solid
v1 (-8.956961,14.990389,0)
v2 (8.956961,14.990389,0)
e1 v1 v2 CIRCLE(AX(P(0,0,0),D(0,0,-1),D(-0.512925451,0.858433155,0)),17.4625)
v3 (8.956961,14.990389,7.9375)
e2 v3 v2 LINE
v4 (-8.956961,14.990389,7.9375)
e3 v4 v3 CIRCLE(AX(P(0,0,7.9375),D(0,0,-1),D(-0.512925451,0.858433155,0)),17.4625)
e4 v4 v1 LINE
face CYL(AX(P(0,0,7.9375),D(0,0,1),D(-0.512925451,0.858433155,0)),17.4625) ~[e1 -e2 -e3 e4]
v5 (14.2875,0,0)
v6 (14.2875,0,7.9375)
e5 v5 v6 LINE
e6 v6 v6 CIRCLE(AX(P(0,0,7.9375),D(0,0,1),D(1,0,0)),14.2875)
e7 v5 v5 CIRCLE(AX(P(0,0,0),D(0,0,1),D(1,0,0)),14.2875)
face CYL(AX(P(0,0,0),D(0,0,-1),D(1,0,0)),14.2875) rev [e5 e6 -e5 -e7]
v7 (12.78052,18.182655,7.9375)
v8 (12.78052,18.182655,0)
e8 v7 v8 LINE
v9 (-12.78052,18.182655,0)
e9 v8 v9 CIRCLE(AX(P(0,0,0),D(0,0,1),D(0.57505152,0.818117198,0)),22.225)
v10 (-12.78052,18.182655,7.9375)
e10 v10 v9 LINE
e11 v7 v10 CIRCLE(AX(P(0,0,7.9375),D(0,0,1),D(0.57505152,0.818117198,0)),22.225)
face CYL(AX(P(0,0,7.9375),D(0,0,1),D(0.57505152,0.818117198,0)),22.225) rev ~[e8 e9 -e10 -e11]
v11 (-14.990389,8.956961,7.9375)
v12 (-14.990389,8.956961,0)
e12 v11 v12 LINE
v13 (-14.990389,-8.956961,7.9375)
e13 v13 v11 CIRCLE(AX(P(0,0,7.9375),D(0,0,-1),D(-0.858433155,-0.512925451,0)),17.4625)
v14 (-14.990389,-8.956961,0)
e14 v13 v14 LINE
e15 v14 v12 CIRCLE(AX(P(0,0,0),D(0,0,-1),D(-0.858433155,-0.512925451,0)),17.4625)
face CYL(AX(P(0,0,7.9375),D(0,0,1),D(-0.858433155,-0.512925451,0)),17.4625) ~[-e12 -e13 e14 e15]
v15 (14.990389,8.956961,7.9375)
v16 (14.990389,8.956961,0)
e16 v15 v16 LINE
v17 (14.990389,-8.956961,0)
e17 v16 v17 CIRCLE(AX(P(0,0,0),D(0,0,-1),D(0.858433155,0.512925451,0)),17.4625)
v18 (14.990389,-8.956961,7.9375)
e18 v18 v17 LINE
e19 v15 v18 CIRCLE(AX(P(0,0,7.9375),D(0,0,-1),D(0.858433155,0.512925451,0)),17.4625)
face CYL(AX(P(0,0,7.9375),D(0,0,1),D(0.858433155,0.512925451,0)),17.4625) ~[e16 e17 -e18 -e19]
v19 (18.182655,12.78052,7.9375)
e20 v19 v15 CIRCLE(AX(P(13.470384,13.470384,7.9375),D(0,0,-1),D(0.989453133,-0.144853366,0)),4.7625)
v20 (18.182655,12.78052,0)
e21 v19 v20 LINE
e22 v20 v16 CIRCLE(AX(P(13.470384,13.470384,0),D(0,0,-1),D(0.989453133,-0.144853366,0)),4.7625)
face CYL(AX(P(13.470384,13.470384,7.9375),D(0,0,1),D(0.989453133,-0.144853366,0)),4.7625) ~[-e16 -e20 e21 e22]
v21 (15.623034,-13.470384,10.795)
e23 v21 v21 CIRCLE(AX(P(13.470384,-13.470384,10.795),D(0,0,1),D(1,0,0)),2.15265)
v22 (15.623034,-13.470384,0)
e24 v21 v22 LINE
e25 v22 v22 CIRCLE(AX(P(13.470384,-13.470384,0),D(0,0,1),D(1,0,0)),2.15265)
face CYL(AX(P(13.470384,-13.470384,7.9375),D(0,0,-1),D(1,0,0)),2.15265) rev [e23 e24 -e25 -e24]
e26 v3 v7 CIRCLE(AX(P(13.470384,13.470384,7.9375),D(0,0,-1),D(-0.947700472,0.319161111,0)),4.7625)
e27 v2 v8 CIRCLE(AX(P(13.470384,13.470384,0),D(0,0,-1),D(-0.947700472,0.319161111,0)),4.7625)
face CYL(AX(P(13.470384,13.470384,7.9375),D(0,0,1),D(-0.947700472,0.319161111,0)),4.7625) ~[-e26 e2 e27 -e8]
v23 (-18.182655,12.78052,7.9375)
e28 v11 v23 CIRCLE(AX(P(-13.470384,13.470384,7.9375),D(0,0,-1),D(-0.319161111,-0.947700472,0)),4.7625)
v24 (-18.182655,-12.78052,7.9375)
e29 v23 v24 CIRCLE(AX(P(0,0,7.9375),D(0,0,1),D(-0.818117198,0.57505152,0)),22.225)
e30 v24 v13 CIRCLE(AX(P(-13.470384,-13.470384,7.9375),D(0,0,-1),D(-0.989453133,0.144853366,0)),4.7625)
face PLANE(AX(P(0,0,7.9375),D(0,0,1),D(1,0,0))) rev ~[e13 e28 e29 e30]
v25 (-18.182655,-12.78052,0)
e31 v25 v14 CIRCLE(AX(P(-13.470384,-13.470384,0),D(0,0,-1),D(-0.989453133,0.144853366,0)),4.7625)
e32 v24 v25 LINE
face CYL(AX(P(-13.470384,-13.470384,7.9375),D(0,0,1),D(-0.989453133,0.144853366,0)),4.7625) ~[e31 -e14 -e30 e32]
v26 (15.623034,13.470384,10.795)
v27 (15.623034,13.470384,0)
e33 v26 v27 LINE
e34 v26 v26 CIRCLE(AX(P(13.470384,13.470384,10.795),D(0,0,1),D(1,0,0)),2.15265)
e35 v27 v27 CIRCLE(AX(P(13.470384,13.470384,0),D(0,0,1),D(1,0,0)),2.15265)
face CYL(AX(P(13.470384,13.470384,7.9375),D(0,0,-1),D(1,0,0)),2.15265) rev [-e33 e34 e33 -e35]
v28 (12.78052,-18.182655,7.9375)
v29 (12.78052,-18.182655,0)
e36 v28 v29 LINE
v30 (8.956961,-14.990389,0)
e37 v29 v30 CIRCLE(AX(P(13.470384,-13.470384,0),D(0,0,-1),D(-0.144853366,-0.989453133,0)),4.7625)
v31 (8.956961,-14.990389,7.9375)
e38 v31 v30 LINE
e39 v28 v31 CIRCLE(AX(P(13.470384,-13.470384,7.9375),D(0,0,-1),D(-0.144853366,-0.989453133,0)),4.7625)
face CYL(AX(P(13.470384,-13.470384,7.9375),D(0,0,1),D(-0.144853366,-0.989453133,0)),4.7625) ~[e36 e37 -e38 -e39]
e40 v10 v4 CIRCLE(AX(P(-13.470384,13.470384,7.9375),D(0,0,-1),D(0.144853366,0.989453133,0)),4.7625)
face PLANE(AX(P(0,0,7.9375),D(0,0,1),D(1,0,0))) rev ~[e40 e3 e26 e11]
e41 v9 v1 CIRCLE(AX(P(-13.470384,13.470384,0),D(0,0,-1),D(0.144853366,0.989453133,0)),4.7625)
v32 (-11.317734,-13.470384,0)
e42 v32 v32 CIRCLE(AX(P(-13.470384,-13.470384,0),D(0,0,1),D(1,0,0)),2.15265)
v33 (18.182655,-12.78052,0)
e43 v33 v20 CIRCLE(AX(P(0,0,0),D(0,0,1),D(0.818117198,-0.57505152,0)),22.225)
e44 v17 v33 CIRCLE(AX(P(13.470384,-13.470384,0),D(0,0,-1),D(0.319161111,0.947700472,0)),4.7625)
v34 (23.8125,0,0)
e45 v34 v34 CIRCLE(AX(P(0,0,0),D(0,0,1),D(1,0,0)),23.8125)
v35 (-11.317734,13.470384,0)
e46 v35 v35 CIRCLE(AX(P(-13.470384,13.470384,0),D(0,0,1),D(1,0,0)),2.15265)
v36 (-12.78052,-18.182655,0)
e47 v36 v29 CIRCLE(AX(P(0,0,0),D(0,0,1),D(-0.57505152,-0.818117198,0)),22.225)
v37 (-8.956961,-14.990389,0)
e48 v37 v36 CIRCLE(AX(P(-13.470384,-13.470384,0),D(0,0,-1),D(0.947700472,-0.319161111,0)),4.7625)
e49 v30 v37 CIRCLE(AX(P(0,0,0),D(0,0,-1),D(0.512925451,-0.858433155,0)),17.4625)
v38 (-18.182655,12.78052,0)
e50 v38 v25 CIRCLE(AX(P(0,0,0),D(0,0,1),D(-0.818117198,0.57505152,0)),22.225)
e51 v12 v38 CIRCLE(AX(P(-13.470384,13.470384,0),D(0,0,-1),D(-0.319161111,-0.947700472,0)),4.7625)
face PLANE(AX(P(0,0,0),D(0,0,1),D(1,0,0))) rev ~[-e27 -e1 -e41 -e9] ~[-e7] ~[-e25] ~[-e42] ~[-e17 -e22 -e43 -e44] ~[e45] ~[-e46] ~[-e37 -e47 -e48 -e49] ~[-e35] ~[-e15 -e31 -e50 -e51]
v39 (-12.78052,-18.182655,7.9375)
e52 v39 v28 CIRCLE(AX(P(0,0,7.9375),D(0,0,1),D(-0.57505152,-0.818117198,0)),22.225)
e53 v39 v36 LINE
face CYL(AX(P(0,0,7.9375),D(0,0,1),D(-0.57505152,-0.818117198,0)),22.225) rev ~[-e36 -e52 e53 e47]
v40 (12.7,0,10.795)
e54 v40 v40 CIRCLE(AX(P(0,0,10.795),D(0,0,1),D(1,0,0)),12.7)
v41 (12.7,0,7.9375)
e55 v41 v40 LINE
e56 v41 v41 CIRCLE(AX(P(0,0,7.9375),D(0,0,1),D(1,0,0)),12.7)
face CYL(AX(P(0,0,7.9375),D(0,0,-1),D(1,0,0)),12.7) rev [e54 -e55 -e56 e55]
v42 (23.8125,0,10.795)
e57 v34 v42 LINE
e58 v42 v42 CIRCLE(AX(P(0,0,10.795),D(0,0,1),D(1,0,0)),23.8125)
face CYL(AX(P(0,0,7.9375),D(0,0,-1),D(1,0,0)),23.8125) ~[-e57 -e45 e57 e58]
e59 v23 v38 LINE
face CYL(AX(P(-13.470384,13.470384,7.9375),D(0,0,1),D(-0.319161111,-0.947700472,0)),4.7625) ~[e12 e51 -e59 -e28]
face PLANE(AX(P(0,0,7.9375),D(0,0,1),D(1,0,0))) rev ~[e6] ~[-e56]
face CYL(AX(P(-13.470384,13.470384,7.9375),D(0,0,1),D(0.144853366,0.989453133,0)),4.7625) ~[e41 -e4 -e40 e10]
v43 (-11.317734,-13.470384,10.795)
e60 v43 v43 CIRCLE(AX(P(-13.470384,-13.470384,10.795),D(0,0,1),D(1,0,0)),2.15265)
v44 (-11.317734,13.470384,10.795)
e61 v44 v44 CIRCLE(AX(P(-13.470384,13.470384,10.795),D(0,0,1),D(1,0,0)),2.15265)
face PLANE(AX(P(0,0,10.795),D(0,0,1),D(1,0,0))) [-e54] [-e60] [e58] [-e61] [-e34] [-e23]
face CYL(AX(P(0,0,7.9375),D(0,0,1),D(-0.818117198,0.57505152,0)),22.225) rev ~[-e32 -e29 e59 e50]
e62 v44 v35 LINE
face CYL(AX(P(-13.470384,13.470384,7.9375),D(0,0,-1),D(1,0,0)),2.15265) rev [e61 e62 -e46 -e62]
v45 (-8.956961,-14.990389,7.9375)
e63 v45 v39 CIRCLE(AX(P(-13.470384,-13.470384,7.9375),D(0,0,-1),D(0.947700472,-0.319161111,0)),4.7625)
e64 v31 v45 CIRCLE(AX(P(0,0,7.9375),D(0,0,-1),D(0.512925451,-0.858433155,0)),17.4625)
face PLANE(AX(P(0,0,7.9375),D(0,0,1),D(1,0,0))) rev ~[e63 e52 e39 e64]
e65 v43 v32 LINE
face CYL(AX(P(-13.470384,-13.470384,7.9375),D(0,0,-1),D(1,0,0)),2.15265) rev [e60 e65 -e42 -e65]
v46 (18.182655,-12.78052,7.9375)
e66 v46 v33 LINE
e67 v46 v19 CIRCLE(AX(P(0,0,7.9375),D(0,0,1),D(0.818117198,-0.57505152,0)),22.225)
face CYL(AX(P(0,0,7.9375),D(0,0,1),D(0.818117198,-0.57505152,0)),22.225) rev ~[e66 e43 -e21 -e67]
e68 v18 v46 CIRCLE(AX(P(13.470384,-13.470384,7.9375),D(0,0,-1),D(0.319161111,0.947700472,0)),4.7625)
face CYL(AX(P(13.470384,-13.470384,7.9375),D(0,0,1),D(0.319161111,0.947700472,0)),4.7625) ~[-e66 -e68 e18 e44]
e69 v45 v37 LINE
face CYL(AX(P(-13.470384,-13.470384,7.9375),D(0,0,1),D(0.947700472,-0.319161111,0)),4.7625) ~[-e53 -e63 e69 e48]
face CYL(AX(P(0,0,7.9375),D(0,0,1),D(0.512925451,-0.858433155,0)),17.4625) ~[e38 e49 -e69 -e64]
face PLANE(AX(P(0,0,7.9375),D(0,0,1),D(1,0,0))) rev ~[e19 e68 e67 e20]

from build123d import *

# Parameters (mm, degrees)
F0_R            = 23.8125
F0_R_2          = 2.15265
F0_R_3          = 14.2875
F1_DEPTH        = 7.9375
F3_DEPTH        = 7.9375
F3_COPIES_COUNT = 4
F4_R            = 23.8125
F4_R_2          = 2.15265
F4_R_3          = 14.2875
F4_R_4          = 12.7
F5_DEPTH        = 2.8575


# Not quite as in the source:
# - a pattern or mirror of a feature is missing from the dataset's text; its kind, count and spacing are read off the source's solid


with BuildPart() as f1:
    # F0 (on Top) → F1 (new body)
    with BuildSketch(Plane.XY):
        Circle(F0_R)
        with Locations((-13.4703841816, -13.4703841816)):
            Circle(F0_R_2, mode=Mode.SUBTRACT)
        with Locations((13.4703841816, -13.4703841816)):
            Circle(F0_R_2, mode=Mode.SUBTRACT)
        with Locations((-13.4703841816, 13.4703841816)):
            Circle(F0_R_2, mode=Mode.SUBTRACT)
        Circle(F0_R_3, mode=Mode.SUBTRACT)
        with Locations((13.4703841816, 13.4703841816)):
            Circle(F0_R_2, mode=Mode.SUBTRACT)
    extrude(amount=F1_DEPTH)

    # F2 (on face) → F3 (cut, through all)
    with BuildSketch(Plane.XY.offset(7.9375)):
        with BuildLine():
            ThreePointArc((12.7805200237, -18.1826547271), (10.4181406182, -17.1262309344), (8.9569606825, -14.9903889737))
            ThreePointArc((8.9569606825, -14.9903889737), (0, -17.4625), (-8.9569606825, -14.9903889737))
            ThreePointArc((-8.9569606825, -14.9903889737), (-10.4181406182, -17.1262309344), (-12.7805200237, -18.1826547271))
            ThreePointArc((-12.7805200237, -18.1826547271), (0, -22.225), (12.7805200237, -18.1826547271))
        make_face()
    f3 = extrude(amount=-F3_DEPTH, mode=Mode.SUBTRACT)

    # F3_copies: F3 ×4 about axis
    f3_copies_axis = Axis((0, 0, 0), (0, 0, 1))
    for i in range(1, F3_COPIES_COUNT):
        add(f3.rotate(f3_copies_axis, i * 360 / F3_COPIES_COUNT), mode=Mode.SUBTRACT)

    # F4 (on face) → F5 (join)
    with BuildSketch(Plane.XY.offset(7.9375)):
        Circle(F4_R)
        with Locations((-13.4703841816, -13.4703841816)):
            Circle(F4_R_2, mode=Mode.SUBTRACT)
        with BuildLine():
            ThreePointArc((-8.9569606825, -14.9903889737), (0, -17.4625), (8.9569606825, -14.9903889737))
            ThreePointArc((8.9569606825, -14.9903889737), (10.4181406182, -17.1262309344), (12.7805200237, -18.1826547271))
            ThreePointArc((12.7805200237, -18.1826547271), (0, -22.225), (-12.7805200237, -18.1826547271))
            ThreePointArc((-12.7805200237, -18.1826547271), (-10.4181406182, -17.1262309344), (-8.9569606825, -14.9903889737))
        make_face(mode=Mode.SUBTRACT)
        with Locations((13.4703841816, -13.4703841816)):
            Circle(F4_R_2, mode=Mode.SUBTRACT)
        with BuildLine():
            ThreePointArc((-14.9903889737, 8.9569606825), (-17.4625, 0), (-14.9903889737, -8.9569606825))
            ThreePointArc((-14.9903889737, -8.9569606825), (-17.1262309344, -10.4181406182), (-18.1826547271, -12.7805200237))
            ThreePointArc((-18.1826547271, -12.7805200237), (-22.225, 0), (-18.1826547271, 12.7805200237))
            ThreePointArc((-18.1826547271, 12.7805200237), (-17.1262309344, 10.4181406182), (-14.9903889737, 8.9569606825))
        make_face(mode=Mode.SUBTRACT)
        with Locations((-13.4703841816, 13.4703841816)):
            Circle(F4_R_2, mode=Mode.SUBTRACT)
        Circle(F4_R_3, mode=Mode.SUBTRACT)
        with BuildLine():
            ThreePointArc((14.9903889737, -8.9569606825), (17.4625, 0), (14.9903889737, 8.9569606825))
            ThreePointArc((14.9903889737, 8.9569606825), (17.1262309344, 10.4181406182), (18.1826547271, 12.7805200237))
            ThreePointArc((18.1826547271, 12.7805200237), (22.225, 0), (18.1826547271, -12.7805200237))
            ThreePointArc((18.1826547271, -12.7805200237), (17.1262309344, -10.4181406182), (14.9903889737, -8.9569606825))
        make_face(mode=Mode.SUBTRACT)
        with BuildLine():
            ThreePointArc((8.9569606825, 14.9903889737), (0, 17.4625), (-8.9569606825, 14.9903889737))
            ThreePointArc((-8.9569606825, 14.9903889737), (-10.4181406182, 17.1262309344), (-12.7805200237, 18.1826547271))
            ThreePointArc((-12.7805200237, 18.1826547271), (0, 22.225), (12.7805200237, 18.1826547271))
            ThreePointArc((12.7805200237, 18.1826547271), (10.4181406182, 17.1262309344), (8.9569606825, 14.9903889737))
        make_face(mode=Mode.SUBTRACT)
        with Locations((13.4703841816, 13.4703841816)):
            Circle(F4_R_2, mode=Mode.SUBTRACT)
        with BuildLine():
            ThreePointArc((12.7805200237, -18.1826547271), (10.4181406182, -17.1262309344), (8.9569606825, -14.9903889737))
            ThreePointArc((8.9569606825, -14.9903889737), (0, -17.4625), (-8.9569606825, -14.9903889737))
            ThreePointArc((-8.9569606825, -14.9903889737), (-10.4181406182, -17.1262309344), (-12.7805200237, -18.1826547271))
            ThreePointArc((-12.7805200237, -18.1826547271), (0, -22.225), (12.7805200237, -18.1826547271))
        make_face()
        with BuildLine():
            ThreePointArc((-18.1826547271, -12.7805200237), (-17.1262309344, -10.4181406182), (-14.9903889737, -8.9569606825))
            ThreePointArc((-14.9903889737, -8.9569606825), (-17.4625, 0), (-14.9903889737, 8.9569606825))
            ThreePointArc((-14.9903889737, 8.9569606825), (-17.1262309344, 10.4181406182), (-18.1826547271, 12.7805200237))
            ThreePointArc((-18.1826547271, 12.7805200237), (-22.225, 0), (-18.1826547271, -12.7805200237))
        make_face()
        Circle(F4_R_3)
        Circle(F4_R_4, mode=Mode.SUBTRACT)
        with BuildLine():
            ThreePointArc((18.1826547271, 12.7805200237), (17.1262309344, 10.4181406182), (14.9903889737, 8.9569606825))
            ThreePointArc((14.9903889737, 8.9569606825), (17.4625, 0), (14.9903889737, -8.9569606825))
            ThreePointArc((14.9903889737, -8.9569606825), (17.1262309344, -10.4181406182), (18.1826547271, -12.7805200237))
            ThreePointArc((18.1826547271, -12.7805200237), (22.225, 0), (18.1826547271, 12.7805200237))
        make_face()
        with BuildLine():
            ThreePointArc((-12.7805200237, 18.1826547271), (-10.4181406182, 17.1262309344), (-8.9569606825, 14.9903889737))
            ThreePointArc((-8.9569606825, 14.9903889737), (0, 17.4625), (8.9569606825, 14.9903889737))
            ThreePointArc((8.9569606825, 14.9903889737), (10.4181406182, 17.1262309344), (12.7805200237, 18.1826547271))
            ThreePointArc((12.7805200237, 18.1826547271), (0, 22.225), (-12.7805200237, 18.1826547271))
        make_face()
    extrude(amount=F5_DEPTH)


solid = f1.part
